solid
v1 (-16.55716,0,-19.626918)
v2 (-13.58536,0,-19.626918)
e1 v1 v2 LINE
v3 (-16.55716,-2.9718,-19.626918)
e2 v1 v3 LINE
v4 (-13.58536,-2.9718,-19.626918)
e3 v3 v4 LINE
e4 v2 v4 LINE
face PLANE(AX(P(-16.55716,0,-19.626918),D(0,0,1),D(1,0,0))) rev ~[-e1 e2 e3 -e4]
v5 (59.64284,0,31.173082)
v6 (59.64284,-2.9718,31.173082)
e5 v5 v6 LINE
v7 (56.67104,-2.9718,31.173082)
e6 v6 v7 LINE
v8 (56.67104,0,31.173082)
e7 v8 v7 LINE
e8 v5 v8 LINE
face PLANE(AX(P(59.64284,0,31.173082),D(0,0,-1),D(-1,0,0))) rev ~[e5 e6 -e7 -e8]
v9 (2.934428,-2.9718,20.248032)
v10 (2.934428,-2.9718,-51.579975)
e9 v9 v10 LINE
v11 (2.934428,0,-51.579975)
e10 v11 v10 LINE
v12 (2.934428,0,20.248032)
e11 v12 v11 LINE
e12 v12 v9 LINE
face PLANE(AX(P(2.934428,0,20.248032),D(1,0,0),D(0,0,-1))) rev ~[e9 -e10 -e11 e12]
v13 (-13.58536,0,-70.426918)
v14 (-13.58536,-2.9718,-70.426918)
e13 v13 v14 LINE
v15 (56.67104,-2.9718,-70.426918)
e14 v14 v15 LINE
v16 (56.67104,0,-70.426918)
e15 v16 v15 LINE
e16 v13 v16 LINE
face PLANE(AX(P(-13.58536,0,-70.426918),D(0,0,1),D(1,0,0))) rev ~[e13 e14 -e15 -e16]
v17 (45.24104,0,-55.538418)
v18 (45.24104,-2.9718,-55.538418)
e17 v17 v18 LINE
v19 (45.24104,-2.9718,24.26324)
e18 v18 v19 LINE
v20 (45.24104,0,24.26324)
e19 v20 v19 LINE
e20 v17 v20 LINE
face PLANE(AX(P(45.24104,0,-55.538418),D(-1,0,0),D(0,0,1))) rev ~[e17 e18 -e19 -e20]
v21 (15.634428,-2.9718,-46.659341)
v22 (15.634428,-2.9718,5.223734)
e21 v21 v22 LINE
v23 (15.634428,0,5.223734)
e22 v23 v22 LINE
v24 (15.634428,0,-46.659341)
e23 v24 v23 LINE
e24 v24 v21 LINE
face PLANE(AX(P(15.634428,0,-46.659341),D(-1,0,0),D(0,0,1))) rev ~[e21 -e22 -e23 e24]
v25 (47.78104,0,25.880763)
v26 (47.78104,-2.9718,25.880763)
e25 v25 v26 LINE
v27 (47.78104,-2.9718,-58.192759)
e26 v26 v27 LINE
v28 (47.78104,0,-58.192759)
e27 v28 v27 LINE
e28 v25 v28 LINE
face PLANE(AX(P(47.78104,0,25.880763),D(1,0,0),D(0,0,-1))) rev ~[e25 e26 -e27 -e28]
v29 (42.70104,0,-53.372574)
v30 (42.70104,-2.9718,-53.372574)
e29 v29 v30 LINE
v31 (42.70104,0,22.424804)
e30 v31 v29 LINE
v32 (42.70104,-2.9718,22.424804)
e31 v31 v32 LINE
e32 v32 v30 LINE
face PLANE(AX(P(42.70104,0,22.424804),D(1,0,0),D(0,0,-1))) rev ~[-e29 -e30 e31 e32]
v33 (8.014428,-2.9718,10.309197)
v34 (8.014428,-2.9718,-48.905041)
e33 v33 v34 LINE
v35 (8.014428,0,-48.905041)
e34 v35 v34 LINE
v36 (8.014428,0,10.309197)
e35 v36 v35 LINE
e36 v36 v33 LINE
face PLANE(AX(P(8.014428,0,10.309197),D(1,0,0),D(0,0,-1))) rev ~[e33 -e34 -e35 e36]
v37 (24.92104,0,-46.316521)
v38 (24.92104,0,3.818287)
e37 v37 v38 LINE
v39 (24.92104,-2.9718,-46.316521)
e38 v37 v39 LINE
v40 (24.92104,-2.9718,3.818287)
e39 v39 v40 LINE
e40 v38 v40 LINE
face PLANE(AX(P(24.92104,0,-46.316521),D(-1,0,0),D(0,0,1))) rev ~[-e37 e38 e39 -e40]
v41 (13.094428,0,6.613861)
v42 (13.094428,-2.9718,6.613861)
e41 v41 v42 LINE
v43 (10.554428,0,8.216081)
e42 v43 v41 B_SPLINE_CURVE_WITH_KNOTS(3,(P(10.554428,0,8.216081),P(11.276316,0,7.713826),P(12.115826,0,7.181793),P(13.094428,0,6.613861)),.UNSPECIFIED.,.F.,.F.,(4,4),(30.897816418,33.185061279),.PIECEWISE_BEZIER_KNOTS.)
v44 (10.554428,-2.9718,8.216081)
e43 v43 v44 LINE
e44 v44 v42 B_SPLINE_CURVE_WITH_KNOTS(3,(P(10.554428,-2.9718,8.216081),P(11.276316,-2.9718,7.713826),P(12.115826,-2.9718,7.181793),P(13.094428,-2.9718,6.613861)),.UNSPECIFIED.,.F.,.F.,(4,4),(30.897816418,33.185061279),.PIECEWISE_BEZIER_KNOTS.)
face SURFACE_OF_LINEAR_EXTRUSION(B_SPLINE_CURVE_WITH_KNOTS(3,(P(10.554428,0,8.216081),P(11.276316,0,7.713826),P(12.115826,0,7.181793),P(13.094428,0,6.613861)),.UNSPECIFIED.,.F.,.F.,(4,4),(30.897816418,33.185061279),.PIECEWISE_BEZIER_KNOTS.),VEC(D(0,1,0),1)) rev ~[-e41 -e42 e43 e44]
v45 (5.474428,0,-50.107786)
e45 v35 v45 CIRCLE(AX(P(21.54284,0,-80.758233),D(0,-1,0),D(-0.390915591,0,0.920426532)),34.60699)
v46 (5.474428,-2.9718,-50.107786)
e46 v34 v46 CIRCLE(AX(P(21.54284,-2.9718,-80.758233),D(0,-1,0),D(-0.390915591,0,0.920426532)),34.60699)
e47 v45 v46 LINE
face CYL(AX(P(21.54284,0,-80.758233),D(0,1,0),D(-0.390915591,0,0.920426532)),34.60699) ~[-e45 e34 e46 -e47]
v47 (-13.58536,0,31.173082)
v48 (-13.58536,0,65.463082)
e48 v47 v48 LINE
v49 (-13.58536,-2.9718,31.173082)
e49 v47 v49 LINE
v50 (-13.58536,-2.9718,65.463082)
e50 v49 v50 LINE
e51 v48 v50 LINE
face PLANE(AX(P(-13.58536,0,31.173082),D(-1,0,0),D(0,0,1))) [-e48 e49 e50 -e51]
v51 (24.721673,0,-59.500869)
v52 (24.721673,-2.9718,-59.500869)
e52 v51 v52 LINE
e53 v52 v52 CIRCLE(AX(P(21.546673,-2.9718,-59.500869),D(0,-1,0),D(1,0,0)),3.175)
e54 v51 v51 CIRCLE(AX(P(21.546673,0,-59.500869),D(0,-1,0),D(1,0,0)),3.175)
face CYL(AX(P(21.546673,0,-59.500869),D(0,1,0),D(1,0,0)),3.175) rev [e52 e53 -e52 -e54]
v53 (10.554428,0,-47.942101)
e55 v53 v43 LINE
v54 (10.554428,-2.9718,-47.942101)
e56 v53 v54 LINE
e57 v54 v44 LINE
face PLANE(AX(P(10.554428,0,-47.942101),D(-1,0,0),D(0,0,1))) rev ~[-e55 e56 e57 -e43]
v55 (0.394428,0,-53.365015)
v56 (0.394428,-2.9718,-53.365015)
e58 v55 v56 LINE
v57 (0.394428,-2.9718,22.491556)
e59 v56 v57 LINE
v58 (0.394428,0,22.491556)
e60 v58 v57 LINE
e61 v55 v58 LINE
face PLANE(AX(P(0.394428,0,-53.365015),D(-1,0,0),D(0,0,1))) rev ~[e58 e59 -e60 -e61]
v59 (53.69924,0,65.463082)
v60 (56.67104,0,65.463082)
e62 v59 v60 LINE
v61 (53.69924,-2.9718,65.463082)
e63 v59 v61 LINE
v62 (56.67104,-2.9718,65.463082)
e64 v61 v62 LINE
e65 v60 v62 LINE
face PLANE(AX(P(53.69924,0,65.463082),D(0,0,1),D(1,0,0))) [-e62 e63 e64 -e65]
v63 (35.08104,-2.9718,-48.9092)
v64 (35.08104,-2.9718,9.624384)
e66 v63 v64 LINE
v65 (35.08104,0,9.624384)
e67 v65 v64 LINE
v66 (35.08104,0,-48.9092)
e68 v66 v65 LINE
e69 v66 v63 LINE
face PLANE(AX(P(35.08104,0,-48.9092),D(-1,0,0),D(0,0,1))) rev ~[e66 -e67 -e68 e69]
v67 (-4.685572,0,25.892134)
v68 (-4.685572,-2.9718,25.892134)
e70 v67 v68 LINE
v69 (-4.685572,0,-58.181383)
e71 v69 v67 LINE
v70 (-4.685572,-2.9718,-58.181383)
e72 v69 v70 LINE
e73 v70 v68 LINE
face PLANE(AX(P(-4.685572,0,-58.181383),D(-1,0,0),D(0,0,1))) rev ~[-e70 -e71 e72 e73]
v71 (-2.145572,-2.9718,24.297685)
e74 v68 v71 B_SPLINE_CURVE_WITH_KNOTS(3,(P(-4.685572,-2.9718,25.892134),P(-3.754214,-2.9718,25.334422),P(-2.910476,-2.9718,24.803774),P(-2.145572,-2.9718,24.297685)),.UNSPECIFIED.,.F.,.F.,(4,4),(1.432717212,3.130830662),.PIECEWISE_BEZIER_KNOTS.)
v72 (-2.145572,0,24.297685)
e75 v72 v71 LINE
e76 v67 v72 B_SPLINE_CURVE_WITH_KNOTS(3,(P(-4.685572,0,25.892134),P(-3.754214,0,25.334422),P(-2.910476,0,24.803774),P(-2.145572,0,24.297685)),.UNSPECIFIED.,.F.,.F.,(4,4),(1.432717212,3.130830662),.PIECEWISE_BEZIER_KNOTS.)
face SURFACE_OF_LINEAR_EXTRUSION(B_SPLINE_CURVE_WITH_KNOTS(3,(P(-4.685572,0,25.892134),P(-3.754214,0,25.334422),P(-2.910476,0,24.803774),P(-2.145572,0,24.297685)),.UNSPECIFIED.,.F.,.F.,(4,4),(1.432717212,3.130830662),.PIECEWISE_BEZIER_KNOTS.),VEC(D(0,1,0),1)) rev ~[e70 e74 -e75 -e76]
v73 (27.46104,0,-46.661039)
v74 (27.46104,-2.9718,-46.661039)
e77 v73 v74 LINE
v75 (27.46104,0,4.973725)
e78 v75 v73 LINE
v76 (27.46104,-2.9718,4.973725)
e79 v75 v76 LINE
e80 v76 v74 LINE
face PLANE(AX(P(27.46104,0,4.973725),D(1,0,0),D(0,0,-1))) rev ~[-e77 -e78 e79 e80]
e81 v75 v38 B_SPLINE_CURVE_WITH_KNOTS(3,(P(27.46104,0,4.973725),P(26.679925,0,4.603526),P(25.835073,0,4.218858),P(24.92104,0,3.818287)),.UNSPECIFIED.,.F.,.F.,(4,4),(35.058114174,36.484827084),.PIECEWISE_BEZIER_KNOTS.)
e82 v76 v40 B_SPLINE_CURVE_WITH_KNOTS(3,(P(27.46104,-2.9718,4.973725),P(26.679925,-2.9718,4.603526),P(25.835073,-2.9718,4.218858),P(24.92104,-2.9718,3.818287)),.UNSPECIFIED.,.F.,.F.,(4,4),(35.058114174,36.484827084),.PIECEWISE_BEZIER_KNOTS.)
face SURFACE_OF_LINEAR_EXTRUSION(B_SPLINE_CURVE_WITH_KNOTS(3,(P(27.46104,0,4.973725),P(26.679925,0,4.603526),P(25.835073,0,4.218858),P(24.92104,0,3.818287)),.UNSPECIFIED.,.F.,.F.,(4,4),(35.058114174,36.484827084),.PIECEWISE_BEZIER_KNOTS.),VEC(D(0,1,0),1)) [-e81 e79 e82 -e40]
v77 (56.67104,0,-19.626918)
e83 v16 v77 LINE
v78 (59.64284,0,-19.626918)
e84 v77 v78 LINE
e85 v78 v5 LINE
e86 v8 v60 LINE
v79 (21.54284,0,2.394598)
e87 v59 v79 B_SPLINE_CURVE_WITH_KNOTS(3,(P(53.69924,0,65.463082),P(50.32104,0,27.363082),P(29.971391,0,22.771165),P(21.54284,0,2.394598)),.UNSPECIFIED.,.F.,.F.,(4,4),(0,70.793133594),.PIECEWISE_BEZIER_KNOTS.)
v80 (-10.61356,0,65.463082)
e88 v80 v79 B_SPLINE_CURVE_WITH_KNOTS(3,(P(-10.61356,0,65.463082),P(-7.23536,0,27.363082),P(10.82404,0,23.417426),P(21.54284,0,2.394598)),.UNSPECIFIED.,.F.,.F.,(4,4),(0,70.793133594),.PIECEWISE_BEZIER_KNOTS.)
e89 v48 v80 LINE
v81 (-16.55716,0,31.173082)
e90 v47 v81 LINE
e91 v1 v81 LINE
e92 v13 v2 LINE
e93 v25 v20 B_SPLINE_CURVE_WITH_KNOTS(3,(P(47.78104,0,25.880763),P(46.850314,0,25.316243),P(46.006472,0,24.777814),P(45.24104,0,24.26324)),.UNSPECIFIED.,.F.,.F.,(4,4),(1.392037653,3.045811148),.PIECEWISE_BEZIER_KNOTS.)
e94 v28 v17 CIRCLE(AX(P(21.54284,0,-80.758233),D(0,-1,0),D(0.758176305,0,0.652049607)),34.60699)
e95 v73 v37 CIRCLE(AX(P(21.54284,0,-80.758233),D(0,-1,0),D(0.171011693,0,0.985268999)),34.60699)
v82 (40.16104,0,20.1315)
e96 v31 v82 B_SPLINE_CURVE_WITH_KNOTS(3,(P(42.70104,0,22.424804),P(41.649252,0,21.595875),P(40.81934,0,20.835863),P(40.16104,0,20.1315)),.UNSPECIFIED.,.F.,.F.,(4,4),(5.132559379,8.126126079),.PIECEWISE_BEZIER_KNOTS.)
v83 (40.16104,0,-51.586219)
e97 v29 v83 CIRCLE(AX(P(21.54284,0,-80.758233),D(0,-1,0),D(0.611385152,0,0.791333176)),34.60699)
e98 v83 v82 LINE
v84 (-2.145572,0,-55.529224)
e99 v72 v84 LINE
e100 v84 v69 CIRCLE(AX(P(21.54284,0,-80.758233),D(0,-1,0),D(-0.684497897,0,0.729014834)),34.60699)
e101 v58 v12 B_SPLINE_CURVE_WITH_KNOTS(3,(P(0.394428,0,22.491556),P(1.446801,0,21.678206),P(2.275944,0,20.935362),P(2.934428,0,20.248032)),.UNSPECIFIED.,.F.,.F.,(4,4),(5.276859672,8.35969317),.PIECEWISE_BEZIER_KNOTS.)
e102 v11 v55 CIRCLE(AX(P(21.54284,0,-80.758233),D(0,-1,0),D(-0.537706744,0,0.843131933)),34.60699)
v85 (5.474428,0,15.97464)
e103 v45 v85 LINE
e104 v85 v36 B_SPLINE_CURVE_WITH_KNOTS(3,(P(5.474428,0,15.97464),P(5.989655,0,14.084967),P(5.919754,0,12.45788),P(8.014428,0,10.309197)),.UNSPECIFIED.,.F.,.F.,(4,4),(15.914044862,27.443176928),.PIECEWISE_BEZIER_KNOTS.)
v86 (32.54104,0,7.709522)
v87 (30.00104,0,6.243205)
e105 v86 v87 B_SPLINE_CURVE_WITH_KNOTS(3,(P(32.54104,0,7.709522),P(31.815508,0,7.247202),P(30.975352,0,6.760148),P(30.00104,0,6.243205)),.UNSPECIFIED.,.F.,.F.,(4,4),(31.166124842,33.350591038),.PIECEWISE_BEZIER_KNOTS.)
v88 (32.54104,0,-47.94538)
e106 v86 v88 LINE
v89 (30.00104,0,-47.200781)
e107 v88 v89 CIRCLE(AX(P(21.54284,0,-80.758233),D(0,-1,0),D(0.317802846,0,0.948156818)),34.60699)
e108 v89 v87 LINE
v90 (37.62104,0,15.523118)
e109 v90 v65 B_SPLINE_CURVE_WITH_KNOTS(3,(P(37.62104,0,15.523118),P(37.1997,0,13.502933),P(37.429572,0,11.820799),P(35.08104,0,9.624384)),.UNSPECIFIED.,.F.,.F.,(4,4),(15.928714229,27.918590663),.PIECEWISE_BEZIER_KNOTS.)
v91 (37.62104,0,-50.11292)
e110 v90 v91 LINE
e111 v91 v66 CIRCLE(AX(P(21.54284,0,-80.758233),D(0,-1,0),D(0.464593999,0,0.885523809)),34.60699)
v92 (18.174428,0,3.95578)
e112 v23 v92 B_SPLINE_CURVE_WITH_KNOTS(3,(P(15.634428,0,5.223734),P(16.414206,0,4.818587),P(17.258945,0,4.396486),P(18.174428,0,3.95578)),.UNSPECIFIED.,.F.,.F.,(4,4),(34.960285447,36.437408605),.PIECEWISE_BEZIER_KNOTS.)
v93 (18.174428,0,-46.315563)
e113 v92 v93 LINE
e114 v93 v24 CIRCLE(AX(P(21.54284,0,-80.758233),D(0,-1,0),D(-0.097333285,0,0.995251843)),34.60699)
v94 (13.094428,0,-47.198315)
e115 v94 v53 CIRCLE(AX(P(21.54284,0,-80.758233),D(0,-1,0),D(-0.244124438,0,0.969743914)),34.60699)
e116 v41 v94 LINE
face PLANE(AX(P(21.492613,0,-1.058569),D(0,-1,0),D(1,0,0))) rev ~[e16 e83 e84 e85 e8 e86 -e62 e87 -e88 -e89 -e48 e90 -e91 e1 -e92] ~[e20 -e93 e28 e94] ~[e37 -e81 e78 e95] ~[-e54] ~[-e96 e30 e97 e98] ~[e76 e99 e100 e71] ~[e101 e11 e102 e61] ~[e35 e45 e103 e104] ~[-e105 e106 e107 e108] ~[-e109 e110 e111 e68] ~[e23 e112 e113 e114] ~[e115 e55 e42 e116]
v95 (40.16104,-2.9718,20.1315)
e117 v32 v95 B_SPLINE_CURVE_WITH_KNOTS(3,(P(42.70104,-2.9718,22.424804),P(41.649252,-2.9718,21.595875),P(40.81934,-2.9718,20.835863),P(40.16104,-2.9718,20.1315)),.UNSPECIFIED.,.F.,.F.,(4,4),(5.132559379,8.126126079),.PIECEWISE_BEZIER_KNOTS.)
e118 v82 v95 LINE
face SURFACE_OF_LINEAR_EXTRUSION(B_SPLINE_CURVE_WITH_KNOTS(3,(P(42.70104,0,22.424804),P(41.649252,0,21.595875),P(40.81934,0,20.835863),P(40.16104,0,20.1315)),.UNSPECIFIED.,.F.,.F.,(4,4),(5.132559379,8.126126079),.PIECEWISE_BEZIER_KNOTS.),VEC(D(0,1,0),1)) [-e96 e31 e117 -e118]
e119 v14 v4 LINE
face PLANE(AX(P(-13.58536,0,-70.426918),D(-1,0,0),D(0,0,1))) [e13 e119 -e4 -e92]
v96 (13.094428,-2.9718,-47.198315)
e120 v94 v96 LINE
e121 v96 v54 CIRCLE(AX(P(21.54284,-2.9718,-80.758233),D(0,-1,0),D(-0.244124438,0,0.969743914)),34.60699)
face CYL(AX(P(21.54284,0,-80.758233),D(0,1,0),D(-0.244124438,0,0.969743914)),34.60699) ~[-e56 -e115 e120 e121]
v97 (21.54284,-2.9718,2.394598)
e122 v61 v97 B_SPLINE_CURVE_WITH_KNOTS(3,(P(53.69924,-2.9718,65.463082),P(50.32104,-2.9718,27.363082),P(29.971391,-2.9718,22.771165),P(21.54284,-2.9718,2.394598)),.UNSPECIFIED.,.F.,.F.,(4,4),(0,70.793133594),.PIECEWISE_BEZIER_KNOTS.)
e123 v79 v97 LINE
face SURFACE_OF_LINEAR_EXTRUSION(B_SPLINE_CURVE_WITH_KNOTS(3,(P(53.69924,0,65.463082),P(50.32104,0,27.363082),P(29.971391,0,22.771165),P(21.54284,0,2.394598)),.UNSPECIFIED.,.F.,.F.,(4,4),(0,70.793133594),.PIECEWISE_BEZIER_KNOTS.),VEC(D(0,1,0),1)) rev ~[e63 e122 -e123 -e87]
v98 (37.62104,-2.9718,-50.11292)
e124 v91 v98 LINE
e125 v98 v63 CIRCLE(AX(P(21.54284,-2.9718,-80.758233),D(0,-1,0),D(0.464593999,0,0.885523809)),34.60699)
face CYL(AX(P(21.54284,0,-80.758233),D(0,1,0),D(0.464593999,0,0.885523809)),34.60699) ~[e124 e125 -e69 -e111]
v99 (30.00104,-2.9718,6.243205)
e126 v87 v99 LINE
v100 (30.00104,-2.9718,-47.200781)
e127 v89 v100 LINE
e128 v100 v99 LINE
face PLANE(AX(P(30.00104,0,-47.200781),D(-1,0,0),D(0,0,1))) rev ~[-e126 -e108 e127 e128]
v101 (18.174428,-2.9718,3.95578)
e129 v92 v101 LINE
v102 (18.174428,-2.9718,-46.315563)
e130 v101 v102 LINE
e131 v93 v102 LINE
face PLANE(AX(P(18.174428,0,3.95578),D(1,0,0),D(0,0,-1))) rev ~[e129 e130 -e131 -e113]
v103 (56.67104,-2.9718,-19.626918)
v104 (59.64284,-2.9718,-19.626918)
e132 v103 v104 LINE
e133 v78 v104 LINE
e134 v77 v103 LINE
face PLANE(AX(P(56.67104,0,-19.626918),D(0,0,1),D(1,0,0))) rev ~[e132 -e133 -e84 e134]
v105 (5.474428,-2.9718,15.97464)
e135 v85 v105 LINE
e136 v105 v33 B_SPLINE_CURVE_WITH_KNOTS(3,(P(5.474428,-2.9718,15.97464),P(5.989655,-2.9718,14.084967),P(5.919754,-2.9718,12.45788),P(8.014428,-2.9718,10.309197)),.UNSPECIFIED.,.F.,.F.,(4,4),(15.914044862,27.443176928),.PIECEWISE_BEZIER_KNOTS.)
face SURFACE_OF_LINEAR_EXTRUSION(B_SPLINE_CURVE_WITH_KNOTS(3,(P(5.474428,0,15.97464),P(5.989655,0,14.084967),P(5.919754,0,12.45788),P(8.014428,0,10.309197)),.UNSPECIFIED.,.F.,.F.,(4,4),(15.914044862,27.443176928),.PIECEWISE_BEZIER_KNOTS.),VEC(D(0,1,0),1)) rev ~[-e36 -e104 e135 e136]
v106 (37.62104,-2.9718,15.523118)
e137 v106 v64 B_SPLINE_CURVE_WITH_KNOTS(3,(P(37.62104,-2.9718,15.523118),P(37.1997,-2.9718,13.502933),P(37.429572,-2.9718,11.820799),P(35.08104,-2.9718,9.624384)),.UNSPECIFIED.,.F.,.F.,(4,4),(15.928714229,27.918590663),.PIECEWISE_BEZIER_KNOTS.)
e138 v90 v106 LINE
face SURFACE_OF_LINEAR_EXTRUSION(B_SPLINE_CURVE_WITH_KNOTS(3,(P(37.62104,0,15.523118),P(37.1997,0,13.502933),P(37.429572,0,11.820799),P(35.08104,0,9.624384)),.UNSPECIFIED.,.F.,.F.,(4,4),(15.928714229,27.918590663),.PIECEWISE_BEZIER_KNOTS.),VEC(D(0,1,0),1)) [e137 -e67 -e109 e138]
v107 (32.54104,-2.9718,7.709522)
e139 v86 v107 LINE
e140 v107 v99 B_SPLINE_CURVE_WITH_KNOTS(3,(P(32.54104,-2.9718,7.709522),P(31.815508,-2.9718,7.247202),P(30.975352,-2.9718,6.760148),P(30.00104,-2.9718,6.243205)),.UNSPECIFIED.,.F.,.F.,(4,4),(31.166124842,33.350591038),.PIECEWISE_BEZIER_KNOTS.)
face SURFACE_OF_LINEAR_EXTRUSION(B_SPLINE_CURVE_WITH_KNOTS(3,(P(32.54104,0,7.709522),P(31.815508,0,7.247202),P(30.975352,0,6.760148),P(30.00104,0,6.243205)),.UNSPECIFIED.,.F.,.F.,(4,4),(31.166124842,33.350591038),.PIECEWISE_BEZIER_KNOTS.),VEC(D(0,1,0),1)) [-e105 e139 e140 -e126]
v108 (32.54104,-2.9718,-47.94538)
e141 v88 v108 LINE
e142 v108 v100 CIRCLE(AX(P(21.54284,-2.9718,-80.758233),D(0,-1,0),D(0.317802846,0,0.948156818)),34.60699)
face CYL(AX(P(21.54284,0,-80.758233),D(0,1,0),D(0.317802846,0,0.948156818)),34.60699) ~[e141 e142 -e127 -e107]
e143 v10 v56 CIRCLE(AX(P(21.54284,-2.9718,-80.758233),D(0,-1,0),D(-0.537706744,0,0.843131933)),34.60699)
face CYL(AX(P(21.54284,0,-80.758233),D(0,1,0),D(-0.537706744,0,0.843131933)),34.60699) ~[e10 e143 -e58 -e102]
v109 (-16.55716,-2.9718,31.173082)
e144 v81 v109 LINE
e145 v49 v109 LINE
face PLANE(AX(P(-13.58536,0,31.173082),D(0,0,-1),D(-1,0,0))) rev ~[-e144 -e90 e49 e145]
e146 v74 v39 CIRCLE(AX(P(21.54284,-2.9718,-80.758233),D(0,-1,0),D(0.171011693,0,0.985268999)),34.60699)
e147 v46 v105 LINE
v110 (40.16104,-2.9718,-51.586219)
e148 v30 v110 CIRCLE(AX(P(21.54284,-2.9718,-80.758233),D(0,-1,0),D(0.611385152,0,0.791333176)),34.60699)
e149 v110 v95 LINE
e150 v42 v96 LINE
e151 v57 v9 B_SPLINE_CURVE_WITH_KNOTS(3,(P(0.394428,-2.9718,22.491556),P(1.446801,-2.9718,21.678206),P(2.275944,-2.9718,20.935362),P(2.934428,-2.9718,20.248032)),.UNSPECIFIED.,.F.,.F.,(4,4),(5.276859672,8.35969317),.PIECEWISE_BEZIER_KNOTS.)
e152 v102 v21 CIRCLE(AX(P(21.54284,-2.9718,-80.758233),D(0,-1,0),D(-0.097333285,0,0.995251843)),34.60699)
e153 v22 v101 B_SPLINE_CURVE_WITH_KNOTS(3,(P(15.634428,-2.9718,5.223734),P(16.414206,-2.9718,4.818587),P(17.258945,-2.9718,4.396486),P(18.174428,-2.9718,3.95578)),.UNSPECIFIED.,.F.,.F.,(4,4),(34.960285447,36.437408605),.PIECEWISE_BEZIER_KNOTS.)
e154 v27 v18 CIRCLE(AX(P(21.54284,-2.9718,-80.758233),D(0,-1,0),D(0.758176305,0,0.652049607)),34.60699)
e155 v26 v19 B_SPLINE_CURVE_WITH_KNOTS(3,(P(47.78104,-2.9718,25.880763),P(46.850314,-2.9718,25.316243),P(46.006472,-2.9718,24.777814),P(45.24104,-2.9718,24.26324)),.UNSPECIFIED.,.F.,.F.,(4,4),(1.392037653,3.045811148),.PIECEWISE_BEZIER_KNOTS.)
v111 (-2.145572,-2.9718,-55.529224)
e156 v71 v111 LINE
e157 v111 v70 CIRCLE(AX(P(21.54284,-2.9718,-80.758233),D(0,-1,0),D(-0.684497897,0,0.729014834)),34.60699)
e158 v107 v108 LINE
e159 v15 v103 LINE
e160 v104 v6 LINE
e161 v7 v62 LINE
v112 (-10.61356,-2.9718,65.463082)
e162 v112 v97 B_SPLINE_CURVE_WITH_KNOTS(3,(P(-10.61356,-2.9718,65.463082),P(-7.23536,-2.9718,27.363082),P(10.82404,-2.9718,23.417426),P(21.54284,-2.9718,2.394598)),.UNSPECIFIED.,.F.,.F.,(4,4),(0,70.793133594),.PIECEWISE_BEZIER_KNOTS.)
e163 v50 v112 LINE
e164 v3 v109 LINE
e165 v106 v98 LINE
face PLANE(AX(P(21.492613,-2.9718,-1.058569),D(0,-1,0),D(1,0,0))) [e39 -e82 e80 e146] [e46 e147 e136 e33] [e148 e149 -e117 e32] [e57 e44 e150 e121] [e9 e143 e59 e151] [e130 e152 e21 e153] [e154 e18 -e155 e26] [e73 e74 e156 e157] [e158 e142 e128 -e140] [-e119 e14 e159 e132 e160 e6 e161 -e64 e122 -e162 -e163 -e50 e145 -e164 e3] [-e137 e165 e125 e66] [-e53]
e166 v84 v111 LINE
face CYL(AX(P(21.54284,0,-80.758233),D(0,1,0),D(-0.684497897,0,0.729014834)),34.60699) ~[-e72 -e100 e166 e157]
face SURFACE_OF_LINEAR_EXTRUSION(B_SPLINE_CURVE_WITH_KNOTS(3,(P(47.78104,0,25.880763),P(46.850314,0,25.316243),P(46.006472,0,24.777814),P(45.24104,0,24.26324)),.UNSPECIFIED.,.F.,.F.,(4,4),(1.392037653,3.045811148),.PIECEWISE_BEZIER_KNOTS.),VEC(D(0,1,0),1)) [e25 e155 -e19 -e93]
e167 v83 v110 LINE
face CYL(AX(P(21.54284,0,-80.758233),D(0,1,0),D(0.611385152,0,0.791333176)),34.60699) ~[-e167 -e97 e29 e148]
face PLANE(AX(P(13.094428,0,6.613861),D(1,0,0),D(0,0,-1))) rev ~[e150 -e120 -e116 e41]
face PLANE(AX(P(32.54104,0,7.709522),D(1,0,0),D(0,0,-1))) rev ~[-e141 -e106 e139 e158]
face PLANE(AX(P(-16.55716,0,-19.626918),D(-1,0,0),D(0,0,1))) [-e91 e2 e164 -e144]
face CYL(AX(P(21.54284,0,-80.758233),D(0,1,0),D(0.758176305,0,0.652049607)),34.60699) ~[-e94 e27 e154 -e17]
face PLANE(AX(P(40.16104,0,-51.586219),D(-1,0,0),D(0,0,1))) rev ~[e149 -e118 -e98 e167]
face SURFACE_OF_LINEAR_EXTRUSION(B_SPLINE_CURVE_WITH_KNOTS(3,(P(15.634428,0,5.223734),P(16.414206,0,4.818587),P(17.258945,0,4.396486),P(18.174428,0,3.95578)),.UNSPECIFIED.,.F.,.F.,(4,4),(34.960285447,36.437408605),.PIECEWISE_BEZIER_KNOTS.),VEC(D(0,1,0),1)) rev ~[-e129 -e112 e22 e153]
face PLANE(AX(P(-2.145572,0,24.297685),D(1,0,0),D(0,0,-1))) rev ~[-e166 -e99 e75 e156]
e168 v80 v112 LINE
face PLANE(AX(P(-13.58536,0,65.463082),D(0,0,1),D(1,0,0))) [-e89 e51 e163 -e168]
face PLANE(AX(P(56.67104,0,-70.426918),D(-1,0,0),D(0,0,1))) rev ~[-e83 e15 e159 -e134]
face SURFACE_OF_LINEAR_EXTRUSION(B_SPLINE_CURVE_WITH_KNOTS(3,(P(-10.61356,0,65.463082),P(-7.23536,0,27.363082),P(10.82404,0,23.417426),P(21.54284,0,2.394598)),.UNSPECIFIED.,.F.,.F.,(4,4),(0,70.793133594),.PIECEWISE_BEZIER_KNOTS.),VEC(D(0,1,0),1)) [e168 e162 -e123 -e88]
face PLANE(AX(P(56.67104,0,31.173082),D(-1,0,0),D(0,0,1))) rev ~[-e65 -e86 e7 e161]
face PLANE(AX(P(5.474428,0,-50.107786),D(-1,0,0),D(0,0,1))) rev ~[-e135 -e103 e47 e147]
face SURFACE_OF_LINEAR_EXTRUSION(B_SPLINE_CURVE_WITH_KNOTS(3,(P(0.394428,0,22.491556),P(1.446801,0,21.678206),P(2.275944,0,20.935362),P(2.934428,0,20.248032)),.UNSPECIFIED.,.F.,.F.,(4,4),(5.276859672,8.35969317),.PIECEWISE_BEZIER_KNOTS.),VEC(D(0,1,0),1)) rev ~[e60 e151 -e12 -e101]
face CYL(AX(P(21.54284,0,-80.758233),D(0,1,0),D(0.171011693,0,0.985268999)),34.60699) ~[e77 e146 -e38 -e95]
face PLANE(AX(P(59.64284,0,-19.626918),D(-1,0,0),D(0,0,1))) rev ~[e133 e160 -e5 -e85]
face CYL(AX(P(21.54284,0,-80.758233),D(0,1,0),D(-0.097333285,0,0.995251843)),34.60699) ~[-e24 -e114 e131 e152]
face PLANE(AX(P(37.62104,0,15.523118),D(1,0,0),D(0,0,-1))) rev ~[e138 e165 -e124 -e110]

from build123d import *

# Parameters (mm, degrees)
F0_R     = 3.175
F0_W     = 2.9718
F0_H     = 50.8
F0_H_2   = 34.29
F1_DEPTH = 2.9718


# Not quite as in the source:
# - a feature names something its author has since deleted; it is built from what else it names


with BuildPart() as f1:
    # F0 (on Front) → F1 (new body)
    with BuildSketch(Plane.XZ):
        with BuildLine():
            Line((-10.6135604082, -19.6269177035), (-10.6135604082, -70.4269177035))
            Line((-10.6135604082, -70.4269177035), (53.6992395918, -70.4269177035))
            Line((53.6992395918, -70.4269177035), (53.6992395918, -19.6269177035))
            Line((53.6992395918, -19.6269177035), (53.6992395918, 31.1730822965))
            Line((53.6992395918, 31.1730822965), (53.6992395918, 65.4630822965))
            add(Edge.make_bspline(
                [(53.6992395918, 65.4630822965), (50.3210395918, 27.3630822965), (29.9713909626, 22.7711647749), (21.5428395918, 2.3945980662)],
                knots=[0, 0, 0, 0, 70.7931335941, 70.7931335941, 70.7931335941, 70.7931335941], degree=3))
            add(Edge.make_bspline(
                [(-10.6135604082, 65.4630822965), (-7.2353604082, 27.3630822965), (10.8240395918, 23.417426143), (21.5428395918, 2.3945980662)],
                knots=[0, 0, 0, 0, 70.7931335941, 70.7931335941, 70.7931335941, 70.7931335941], degree=3))
            Line((-10.6135604082, 65.4630822965), (-10.6135604082, 31.1730822965))
            Line((-10.6135604082, 31.1730822965), (-10.6135604082, -19.6269177035))
        make_face()
        with Locations((21.5466730297, -59.5008693635)):
            Circle(F0_R, mode=Mode.SUBTRACT)
        with BuildLine():
            add(Edge.make_bspline(
                [(18.174427537, 3.9557799586), (19.2048586468, 3.4597391149), (20.3249139395, 2.9401290525), (21.5428395918, 2.3945980662)],
                knots=[36.4374086053, 36.4374086053, 36.4374086053, 36.4374086053, 38.1, 38.1, 38.1, 38.1], degree=3))
            add(Edge.make_bspline(
                [(24.9210395918, 3.8182866349), (23.8862684635, 3.3648017903), (22.7628335347, 2.8909334778), (21.5428395918, 2.3945980662)],
                knots=[36.4848270835, 36.4848270835, 36.4848270835, 36.4848270835, 38.1, 38.1, 38.1, 38.1], degree=3))
            add(Edge.make_bspline(
                [(27.4610395918, 4.9737252721), (26.6799254221, 4.6035259347), (25.8350725803, 4.2188584101), (24.9210395918, 3.8182866349)],
                knots=[35.0581141735, 35.0581141735, 35.0581141735, 35.0581141735, 36.4848270835, 36.4848270835, 36.4848270835, 36.4848270835], degree=3))
            add(Edge.make_bspline(
                [(30.0010395918, 6.2432045407), (29.2394523696, 5.8391275699), (28.3958951656, 5.4167884341), (27.4610395918, 4.9737252721)],
                knots=[33.3505910381, 33.3505910381, 33.3505910381, 33.3505910381, 35.0581141735, 35.0581141735, 35.0581141735, 35.0581141735], degree=3))
            add(Edge.make_bspline(
                [(32.5410395918, 7.709522157), (31.815508389, 7.2472020661), (30.9753523304, 6.7601477463), (30.0010395918, 6.2432045407)],
                knots=[31.1661248423, 31.1661248423, 31.1661248423, 31.1661248423, 33.3505910381, 33.3505910381, 33.3505910381, 33.3505910381], degree=3))
            add(Edge.make_bspline(
                [(35.0810395918, 9.6243844167), (34.4449246224, 9.0294716961), (33.6196497273, 8.3968297933), (32.5410395918, 7.709522157)],
                knots=[27.9185906625, 27.9185906625, 27.9185906625, 27.9185906625, 31.1661248423, 31.1661248423, 31.1661248423, 31.1661248423], degree=3))
            add(Edge.make_bspline(
                [(37.6210395918, 15.5231181366), (37.1997000639, 13.5029330493), (37.4295721889, 11.8207985618), (35.0810395918, 9.6243844167)],
                knots=[15.9287142288, 15.9287142288, 15.9287142288, 15.9287142288, 27.9185906625, 27.9185906625, 27.9185906625, 27.9185906625], degree=3))
            add(Edge.make_bspline(
                [(40.1610395918, 20.1314996321), (38.4452100282, 18.2956109855), (37.8952324766, 16.8377832468), (37.6210395918, 15.5231181366)],
                knots=[8.1261260785, 8.1261260785, 8.1261260785, 8.1261260785, 15.9287142288, 15.9287142288, 15.9287142288, 15.9287142288], degree=3))
            add(Edge.make_bspline(
                [(42.7010395918, 22.4248035121), (41.6492517803, 21.5958754464), (40.8193404202, 20.8358627241), (40.1610395918, 20.1314996321)],
                knots=[5.1325593794, 5.1325593794, 5.1325593794, 5.1325593794, 8.1261260785, 8.1261260785, 8.1261260785, 8.1261260785], degree=3))
            add(Edge.make_bspline(
                [(45.2410395918, 24.2632398541), (44.2752085711, 23.6139450004), (43.4342172947, 23.0026306826), (42.7010395918, 22.4248035121)],
                knots=[3.0458111478, 3.0458111478, 3.0458111478, 3.0458111478, 5.1325593794, 5.1325593794, 5.1325593794, 5.1325593794], degree=3))
            add(Edge.make_bspline(
                [(47.7810395918, 25.8807627574), (46.8503141861, 25.3162427283), (46.0064724881, 24.7778139666), (45.2410395918, 24.2632398541)],
                knots=[1.3920376526, 1.3920376526, 1.3920376526, 1.3920376526, 3.0458111478, 3.0458111478, 3.0458111478, 3.0458111478], degree=3))
            add(Edge.make_bspline(
                [(50.3210395918, 27.3630822965), (49.4094448692, 26.8496004392), (48.5644629644, 26.3559385528), (47.7810395918, 25.8807627574)],
                knots=[0, 0, 0, 0, 1.3920376526, 1.3920376526, 1.3920376526, 1.3920376526], degree=3))
            Line((50.3210395918, 27.3630822965), (50.3210395918, -61.5369177035))
            ThreePointArc((50.3210395918, -61.5369177035), (49.1018112077, -59.8262756393), (47.7810395918, -58.1927590453))
            ThreePointArc((47.7810395918, -58.1927590453), (46.5462872107, -56.8318592668), (45.2410395918, -55.5384180031))
            ThreePointArc((45.2410395918, -55.5384180031), (43.9971682474, -54.4248535099), (42.7010395918, -53.3725739321))
            ThreePointArc((42.7010395918, -53.3725739321), (41.4510857441, -52.4508932423), (40.1610395918, -51.5862194078))
            ThreePointArc((40.1610395918, -51.5862194078), (38.9066725875, -50.8226179021), (37.6210395918, -50.112919627))
            ThreePointArc((37.6210395918, -50.112919627), (36.36326544, -49.4852618571), (35.0810395918, -48.9092002568))
            ThreePointArc((35.0810395918, -48.9092002568), (33.8205009635, -48.4023559957), (32.5410395918, -47.9453796977))
            ThreePointArc((32.5410395918, -47.9453796977), (31.2781609586, -47.5487876175), (30.0010395918, -47.2007808145))
            ThreePointArc((30.0010395918, -47.2007808145), (28.7361037745, -46.907078004), (27.4610395918, -46.6610387941))
            ThreePointArc((27.4610395918, -46.6610387941), (26.1942303865, -46.4652554761), (24.9210395918, -46.316521248))
            ThreePointArc((24.9210395918, -46.316521248), (21.547756981, -46.1512435423), (18.174427537, -46.3155626059))
            ThreePointArc((18.174427537, -46.3155626059), (16.901243708, -46.46392835), (15.634427537, -46.659341362))
            ThreePointArc((15.634427537, -46.659341362), (14.3593708721, -46.90499798), (13.094427537, -47.1983152681))
            ThreePointArc((13.094427537, -47.1983152681), (11.8173145662, -47.5459173972), (10.554427537, -47.9421006017))
            ThreePointArc((10.554427537, -47.9421006017), (9.2749758876, -48.3986398999), (8.014427537, -48.9050414301))
            ThreePointArc((8.014427537, -48.9050414301), (6.7322134008, -49.480619628), (5.474427537, -50.1077863311))
            ThreePointArc((5.474427537, -50.1077863311), (4.1888093009, -50.8169340928), (2.934427537, -51.5799748434))
            ThreePointArc((2.934427537, -51.5799748434), (1.6444010223, -52.4439982142), (0.394427537, -53.365014544))
            ThreePointArc((0.394427537, -53.365014544), (-0.9016730983, -54.4164866486), (-2.145572463, -55.5292241802))
            ThreePointArc((-2.145572463, -55.5292241802), (-3.4507759715, -56.8215888342), (-4.685572463, -58.1813830179))
            ThreePointArc((-4.685572463, -58.1813830179), (-6.0115928229, -59.8203006816), (-7.2353604082, -61.5369177035))
            add(Edge.make_bspline(
                [(-7.2353604082, 27.3630822965), (-7.2353604082, -0.334873893), (-7.2353604082, -33.838961514), (-7.2353604082, -61.5369177035)],
                knots=[0, 0, 0, 0, 88.9, 88.9, 88.9, 88.9], degree=3))
            add(Edge.make_bspline(
                [(-7.2353604082, 27.3630822965), (-6.3195404997, 26.8524970598), (-5.4713701457, 26.3626827218), (-4.685572463, 25.8921343821)],
                knots=[0, 0, 0, 0, 1.4327172124, 1.4327172124, 1.4327172124, 1.4327172124], degree=3))
            add(Edge.make_bspline(
                [(-4.685572463, 25.8921343821), (-3.7542137819, 25.3344217663), (-2.9104758153, 24.8037738972), (-2.145572463, 24.29768509)],
                knots=[1.4327172124, 1.4327172124, 1.4327172124, 1.4327172124, 3.1308306617, 3.1308306617, 3.1308306617, 3.1308306617], degree=3))
            add(Edge.make_bspline(
                [(-2.145572463, 24.29768509), (-1.1789086721, 23.6581039933), (-0.3381532858, 23.057746686), (0.394427537, 22.491555701)],
                knots=[3.1308306617, 3.1308306617, 3.1308306617, 3.1308306617, 5.2768596724, 5.2768596724, 5.2768596724, 5.2768596724], degree=3))
            add(Edge.make_bspline(
                [(0.394427537, 22.491555701), (1.4468013348, 21.6782057761), (2.2759443341, 20.9353620327), (2.934427537, 20.2480318861)],
                knots=[5.2768596724, 5.2768596724, 5.2768596724, 5.2768596724, 8.3596931702, 8.3596931702, 8.3596931702, 8.3596931702], degree=3))
            add(Edge.make_bspline(
                [(2.934427537, 20.2480318861), (4.5480124747, 18.5637587463), (5.1368295827, 17.2128303622), (5.474427537, 15.9746404386)],
                knots=[8.3596931702, 8.3596931702, 8.3596931702, 8.3596931702, 15.9140448616, 15.9140448616, 15.9140448616, 15.9140448616], degree=3))
            add(Edge.make_bspline(
                [(5.474427537, 15.9746404386), (5.9896552573, 14.084967342), (5.9197540389, 12.4578798594), (8.014427537, 10.3091972977)],
                knots=[15.9140448616, 15.9140448616, 15.9140448616, 15.9140448616, 27.4431769284, 27.4431769284, 27.4431769284, 27.4431769284], degree=3))
            add(Edge.make_bspline(
                [(8.014427537, 10.3091972977), (8.6420846531, 9.6653566698), (9.4640918921, 8.9746837165), (10.554427537, 8.2160807673)],
                knots=[27.4431769284, 27.4431769284, 27.4431769284, 27.4431769284, 30.8978164182, 30.8978164182, 30.8978164182, 30.8978164182], degree=3))
            add(Edge.make_bspline(
                [(10.554427537, 8.2160807673), (11.2763160606, 7.713825553), (12.1158260279, 7.1817933043), (13.094427537, 6.6138610208)],
                knots=[30.8978164182, 30.8978164182, 30.8978164182, 30.8978164182, 33.1850612795, 33.1850612795, 33.1850612795, 33.1850612795], degree=3))
            add(Edge.make_bspline(
                [(13.094427537, 6.6138610208), (13.8539601424, 6.1730655764), (14.6972807439, 5.7106441444), (15.634427537, 5.2237339583)],
                knots=[33.1850612795, 33.1850612795, 33.1850612795, 33.1850612795, 34.9602854465, 34.9602854465, 34.9602854465, 34.9602854465], degree=3))
            add(Edge.make_bspline(
                [(15.634427537, 5.2237339583), (16.4142058077, 4.8185872026), (17.2589448389, 4.3964856066), (18.174427537, 3.9557799586)],
                knots=[34.9602854465, 34.9602854465, 34.9602854465, 34.9602854465, 36.4374086053, 36.4374086053, 36.4374086053, 36.4374086053], degree=3))
        make_face(mode=Mode.SUBTRACT)
        with BuildLine():
            add(Edge.make_bspline(
                [(24.9210395918, 3.8182866349), (23.8862684635, 3.3648017903), (22.7628335347, 2.8909334778), (21.5428395918, 2.3945980662)],
                knots=[36.4848270835, 36.4848270835, 36.4848270835, 36.4848270835, 38.1, 38.1, 38.1, 38.1], degree=3))
            add(Edge.make_bspline(
                [(18.174427537, 3.9557799586), (19.2048586468, 3.4597391149), (20.3249139395, 2.9401290525), (21.5428395918, 2.3945980662)],
                knots=[36.4374086053, 36.4374086053, 36.4374086053, 36.4374086053, 38.1, 38.1, 38.1, 38.1], degree=3))
            Line((18.174427537, 3.9557799586), (18.174427537, -46.3155626059))
            ThreePointArc((18.174427537, -46.3155626059), (21.547756981, -46.1512435423), (24.9210395918, -46.316521248))
            Line((24.9210395918, -46.316521248), (24.9210395918, 3.8182866349))
        make_face()
        with BuildLine():
            Line((-4.685572463, -58.1813830179), (-4.685572463, 25.8921343821))
            add(Edge.make_bspline(
                [(-7.2353604082, 27.3630822965), (-6.3195404997, 26.8524970598), (-5.4713701457, 26.3626827218), (-4.685572463, 25.8921343821)],
                knots=[0, 0, 0, 0, 1.4327172124, 1.4327172124, 1.4327172124, 1.4327172124], degree=3))
            add(Edge.make_bspline(
                [(-7.2353604082, 27.3630822965), (-7.2353604082, -0.334873893), (-7.2353604082, -33.838961514), (-7.2353604082, -61.5369177035)],
                knots=[0, 0, 0, 0, 88.9, 88.9, 88.9, 88.9], degree=3))
            ThreePointArc((-7.2353604082, -61.5369177035), (-6.0115928229, -59.8203006816), (-4.685572463, -58.1813830179))
        make_face()
        with BuildLine():
            add(Edge.make_bspline(
                [(50.3210395918, 27.3630822965), (49.4094448692, 26.8496004392), (48.5644629644, 26.3559385528), (47.7810395918, 25.8807627574)],
                knots=[0, 0, 0, 0, 1.3920376526, 1.3920376526, 1.3920376526, 1.3920376526], degree=3))
            Line((47.7810395918, 25.8807627574), (47.7810395918, -58.1927590453))
            ThreePointArc((47.7810395918, -58.1927590453), (49.1018112077, -59.8262756393), (50.3210395918, -61.5369177035))
            Line((50.3210395918, -61.5369177035), (50.3210395918, 27.3630822965))
        make_face()
        with BuildLine():
            Line((0.394427537, -53.365014544), (0.394427537, 22.491555701))
            add(Edge.make_bspline(
                [(-2.145572463, 24.29768509), (-1.1789086721, 23.6581039933), (-0.3381532858, 23.057746686), (0.394427537, 22.491555701)],
                knots=[3.1308306617, 3.1308306617, 3.1308306617, 3.1308306617, 5.2768596724, 5.2768596724, 5.2768596724, 5.2768596724], degree=3))
            Line((-2.145572463, 24.29768509), (-2.145572463, -55.5292241802))
            ThreePointArc((-2.145572463, -55.5292241802), (-0.9016730983, -54.4164866486), (0.394427537, -53.365014544))
        make_face()
        with BuildLine():
            add(Edge.make_bspline(
                [(45.2410395918, 24.2632398541), (44.2752085711, 23.6139450004), (43.4342172947, 23.0026306826), (42.7010395918, 22.4248035121)],
                knots=[3.0458111478, 3.0458111478, 3.0458111478, 3.0458111478, 5.1325593794, 5.1325593794, 5.1325593794, 5.1325593794], degree=3))
            Line((42.7010395918, 22.4248035121), (42.7010395918, -53.3725739321))
            ThreePointArc((42.7010395918, -53.3725739321), (43.9971682474, -54.4248535099), (45.2410395918, -55.5384180031))
            Line((45.2410395918, -55.5384180031), (45.2410395918, 24.2632398541))
        make_face()
        with BuildLine():
            Line((5.474427537, -50.1077863311), (5.474427537, 15.9746404386))
            add(Edge.make_bspline(
                [(2.934427537, 20.2480318861), (4.5480124747, 18.5637587463), (5.1368295827, 17.2128303622), (5.474427537, 15.9746404386)],
                knots=[8.3596931702, 8.3596931702, 8.3596931702, 8.3596931702, 15.9140448616, 15.9140448616, 15.9140448616, 15.9140448616], degree=3))
            Line((2.934427537, 20.2480318861), (2.934427537, -51.5799748434))
            ThreePointArc((2.934427537, -51.5799748434), (4.1888093009, -50.8169340928), (5.474427537, -50.1077863311))
        make_face()
        with BuildLine():
            add(Edge.make_bspline(
                [(40.1610395918, 20.1314996321), (38.4452100282, 18.2956109855), (37.8952324766, 16.8377832468), (37.6210395918, 15.5231181366)],
                knots=[8.1261260785, 8.1261260785, 8.1261260785, 8.1261260785, 15.9287142288, 15.9287142288, 15.9287142288, 15.9287142288], degree=3))
            Line((37.6210395918, 15.5231181366), (37.6210395918, -50.112919627))
            ThreePointArc((37.6210395918, -50.112919627), (38.9066725875, -50.8226179021), (40.1610395918, -51.5862194078))
            Line((40.1610395918, -51.5862194078), (40.1610395918, 20.1314996321))
        make_face()
        with Locations((55.1851395918, 5.7730822965)):
            Rectangle(F0_W, F0_H)
        with Locations((-12.0994604082, 5.7730822965)):
            Rectangle(F0_W, F0_H)
        with Locations((-15.0712604082, 5.7730822965)):
            Rectangle(F0_W, F0_H)
        with Locations((-12.0994604082, -45.0269177035)):
            Rectangle(F0_W, F0_H)
        with Locations((55.1851395918, -45.0269177035)):
            Rectangle(F0_W, F0_H)
        with Locations((58.1569395918, 5.7730822965)):
            Rectangle(F0_W, F0_H)
        with BuildLine():
            Line((10.554427537, -47.9421006017), (10.554427537, 8.2160807673))
            add(Edge.make_bspline(
                [(8.014427537, 10.3091972977), (8.6420846531, 9.6653566698), (9.4640918921, 8.9746837165), (10.554427537, 8.2160807673)],
                knots=[27.4431769284, 27.4431769284, 27.4431769284, 27.4431769284, 30.8978164182, 30.8978164182, 30.8978164182, 30.8978164182], degree=3))
            Line((8.014427537, 10.3091972977), (8.014427537, -48.9050414301))
            ThreePointArc((8.014427537, -48.9050414301), (9.2749758876, -48.3986398999), (10.554427537, -47.9421006017))
        make_face()
        with BuildLine():
            add(Edge.make_bspline(
                [(35.0810395918, 9.6243844167), (34.4449246224, 9.0294716961), (33.6196497273, 8.3968297933), (32.5410395918, 7.709522157)],
                knots=[27.9185906625, 27.9185906625, 27.9185906625, 27.9185906625, 31.1661248423, 31.1661248423, 31.1661248423, 31.1661248423], degree=3))
            Line((32.5410395918, 7.709522157), (32.5410395918, -47.9453796977))
            ThreePointArc((32.5410395918, -47.9453796977), (33.8205009635, -48.4023559957), (35.0810395918, -48.9092002568))
            Line((35.0810395918, -48.9092002568), (35.0810395918, 9.6243844167))
        make_face()
        with BuildLine():
            Line((15.634427537, -46.659341362), (15.634427537, 5.2237339583))
            add(Edge.make_bspline(
                [(13.094427537, 6.6138610208), (13.8539601424, 6.1730655764), (14.6972807439, 5.7106441444), (15.634427537, 5.2237339583)],
                knots=[33.1850612795, 33.1850612795, 33.1850612795, 33.1850612795, 34.9602854465, 34.9602854465, 34.9602854465, 34.9602854465], degree=3))
            Line((13.094427537, 6.6138610208), (13.094427537, -47.1983152681))
            ThreePointArc((13.094427537, -47.1983152681), (14.3593708721, -46.90499798), (15.634427537, -46.659341362))
        make_face()
        with BuildLine():
            add(Edge.make_bspline(
                [(30.0010395918, 6.2432045407), (29.2394523696, 5.8391275699), (28.3958951656, 5.4167884341), (27.4610395918, 4.9737252721)],
                knots=[33.3505910381, 33.3505910381, 33.3505910381, 33.3505910381, 35.0581141735, 35.0581141735, 35.0581141735, 35.0581141735], degree=3))
            Line((27.4610395918, 4.9737252721), (27.4610395918, -46.6610387941))
            ThreePointArc((27.4610395918, -46.6610387941), (28.7361037745, -46.907078004), (30.0010395918, -47.2007808145))
            Line((30.0010395918, -47.2007808145), (30.0010395918, 6.2432045407))
        make_face()
        with Locations((-12.0994604082, 48.3180822965)):
            Rectangle(F0_W, F0_H_2)
        with Locations((55.1851395918, 48.3180822965)):
            Rectangle(F0_W, F0_H_2)
    extrude(amount=F1_DEPTH)


solid = f1.part
